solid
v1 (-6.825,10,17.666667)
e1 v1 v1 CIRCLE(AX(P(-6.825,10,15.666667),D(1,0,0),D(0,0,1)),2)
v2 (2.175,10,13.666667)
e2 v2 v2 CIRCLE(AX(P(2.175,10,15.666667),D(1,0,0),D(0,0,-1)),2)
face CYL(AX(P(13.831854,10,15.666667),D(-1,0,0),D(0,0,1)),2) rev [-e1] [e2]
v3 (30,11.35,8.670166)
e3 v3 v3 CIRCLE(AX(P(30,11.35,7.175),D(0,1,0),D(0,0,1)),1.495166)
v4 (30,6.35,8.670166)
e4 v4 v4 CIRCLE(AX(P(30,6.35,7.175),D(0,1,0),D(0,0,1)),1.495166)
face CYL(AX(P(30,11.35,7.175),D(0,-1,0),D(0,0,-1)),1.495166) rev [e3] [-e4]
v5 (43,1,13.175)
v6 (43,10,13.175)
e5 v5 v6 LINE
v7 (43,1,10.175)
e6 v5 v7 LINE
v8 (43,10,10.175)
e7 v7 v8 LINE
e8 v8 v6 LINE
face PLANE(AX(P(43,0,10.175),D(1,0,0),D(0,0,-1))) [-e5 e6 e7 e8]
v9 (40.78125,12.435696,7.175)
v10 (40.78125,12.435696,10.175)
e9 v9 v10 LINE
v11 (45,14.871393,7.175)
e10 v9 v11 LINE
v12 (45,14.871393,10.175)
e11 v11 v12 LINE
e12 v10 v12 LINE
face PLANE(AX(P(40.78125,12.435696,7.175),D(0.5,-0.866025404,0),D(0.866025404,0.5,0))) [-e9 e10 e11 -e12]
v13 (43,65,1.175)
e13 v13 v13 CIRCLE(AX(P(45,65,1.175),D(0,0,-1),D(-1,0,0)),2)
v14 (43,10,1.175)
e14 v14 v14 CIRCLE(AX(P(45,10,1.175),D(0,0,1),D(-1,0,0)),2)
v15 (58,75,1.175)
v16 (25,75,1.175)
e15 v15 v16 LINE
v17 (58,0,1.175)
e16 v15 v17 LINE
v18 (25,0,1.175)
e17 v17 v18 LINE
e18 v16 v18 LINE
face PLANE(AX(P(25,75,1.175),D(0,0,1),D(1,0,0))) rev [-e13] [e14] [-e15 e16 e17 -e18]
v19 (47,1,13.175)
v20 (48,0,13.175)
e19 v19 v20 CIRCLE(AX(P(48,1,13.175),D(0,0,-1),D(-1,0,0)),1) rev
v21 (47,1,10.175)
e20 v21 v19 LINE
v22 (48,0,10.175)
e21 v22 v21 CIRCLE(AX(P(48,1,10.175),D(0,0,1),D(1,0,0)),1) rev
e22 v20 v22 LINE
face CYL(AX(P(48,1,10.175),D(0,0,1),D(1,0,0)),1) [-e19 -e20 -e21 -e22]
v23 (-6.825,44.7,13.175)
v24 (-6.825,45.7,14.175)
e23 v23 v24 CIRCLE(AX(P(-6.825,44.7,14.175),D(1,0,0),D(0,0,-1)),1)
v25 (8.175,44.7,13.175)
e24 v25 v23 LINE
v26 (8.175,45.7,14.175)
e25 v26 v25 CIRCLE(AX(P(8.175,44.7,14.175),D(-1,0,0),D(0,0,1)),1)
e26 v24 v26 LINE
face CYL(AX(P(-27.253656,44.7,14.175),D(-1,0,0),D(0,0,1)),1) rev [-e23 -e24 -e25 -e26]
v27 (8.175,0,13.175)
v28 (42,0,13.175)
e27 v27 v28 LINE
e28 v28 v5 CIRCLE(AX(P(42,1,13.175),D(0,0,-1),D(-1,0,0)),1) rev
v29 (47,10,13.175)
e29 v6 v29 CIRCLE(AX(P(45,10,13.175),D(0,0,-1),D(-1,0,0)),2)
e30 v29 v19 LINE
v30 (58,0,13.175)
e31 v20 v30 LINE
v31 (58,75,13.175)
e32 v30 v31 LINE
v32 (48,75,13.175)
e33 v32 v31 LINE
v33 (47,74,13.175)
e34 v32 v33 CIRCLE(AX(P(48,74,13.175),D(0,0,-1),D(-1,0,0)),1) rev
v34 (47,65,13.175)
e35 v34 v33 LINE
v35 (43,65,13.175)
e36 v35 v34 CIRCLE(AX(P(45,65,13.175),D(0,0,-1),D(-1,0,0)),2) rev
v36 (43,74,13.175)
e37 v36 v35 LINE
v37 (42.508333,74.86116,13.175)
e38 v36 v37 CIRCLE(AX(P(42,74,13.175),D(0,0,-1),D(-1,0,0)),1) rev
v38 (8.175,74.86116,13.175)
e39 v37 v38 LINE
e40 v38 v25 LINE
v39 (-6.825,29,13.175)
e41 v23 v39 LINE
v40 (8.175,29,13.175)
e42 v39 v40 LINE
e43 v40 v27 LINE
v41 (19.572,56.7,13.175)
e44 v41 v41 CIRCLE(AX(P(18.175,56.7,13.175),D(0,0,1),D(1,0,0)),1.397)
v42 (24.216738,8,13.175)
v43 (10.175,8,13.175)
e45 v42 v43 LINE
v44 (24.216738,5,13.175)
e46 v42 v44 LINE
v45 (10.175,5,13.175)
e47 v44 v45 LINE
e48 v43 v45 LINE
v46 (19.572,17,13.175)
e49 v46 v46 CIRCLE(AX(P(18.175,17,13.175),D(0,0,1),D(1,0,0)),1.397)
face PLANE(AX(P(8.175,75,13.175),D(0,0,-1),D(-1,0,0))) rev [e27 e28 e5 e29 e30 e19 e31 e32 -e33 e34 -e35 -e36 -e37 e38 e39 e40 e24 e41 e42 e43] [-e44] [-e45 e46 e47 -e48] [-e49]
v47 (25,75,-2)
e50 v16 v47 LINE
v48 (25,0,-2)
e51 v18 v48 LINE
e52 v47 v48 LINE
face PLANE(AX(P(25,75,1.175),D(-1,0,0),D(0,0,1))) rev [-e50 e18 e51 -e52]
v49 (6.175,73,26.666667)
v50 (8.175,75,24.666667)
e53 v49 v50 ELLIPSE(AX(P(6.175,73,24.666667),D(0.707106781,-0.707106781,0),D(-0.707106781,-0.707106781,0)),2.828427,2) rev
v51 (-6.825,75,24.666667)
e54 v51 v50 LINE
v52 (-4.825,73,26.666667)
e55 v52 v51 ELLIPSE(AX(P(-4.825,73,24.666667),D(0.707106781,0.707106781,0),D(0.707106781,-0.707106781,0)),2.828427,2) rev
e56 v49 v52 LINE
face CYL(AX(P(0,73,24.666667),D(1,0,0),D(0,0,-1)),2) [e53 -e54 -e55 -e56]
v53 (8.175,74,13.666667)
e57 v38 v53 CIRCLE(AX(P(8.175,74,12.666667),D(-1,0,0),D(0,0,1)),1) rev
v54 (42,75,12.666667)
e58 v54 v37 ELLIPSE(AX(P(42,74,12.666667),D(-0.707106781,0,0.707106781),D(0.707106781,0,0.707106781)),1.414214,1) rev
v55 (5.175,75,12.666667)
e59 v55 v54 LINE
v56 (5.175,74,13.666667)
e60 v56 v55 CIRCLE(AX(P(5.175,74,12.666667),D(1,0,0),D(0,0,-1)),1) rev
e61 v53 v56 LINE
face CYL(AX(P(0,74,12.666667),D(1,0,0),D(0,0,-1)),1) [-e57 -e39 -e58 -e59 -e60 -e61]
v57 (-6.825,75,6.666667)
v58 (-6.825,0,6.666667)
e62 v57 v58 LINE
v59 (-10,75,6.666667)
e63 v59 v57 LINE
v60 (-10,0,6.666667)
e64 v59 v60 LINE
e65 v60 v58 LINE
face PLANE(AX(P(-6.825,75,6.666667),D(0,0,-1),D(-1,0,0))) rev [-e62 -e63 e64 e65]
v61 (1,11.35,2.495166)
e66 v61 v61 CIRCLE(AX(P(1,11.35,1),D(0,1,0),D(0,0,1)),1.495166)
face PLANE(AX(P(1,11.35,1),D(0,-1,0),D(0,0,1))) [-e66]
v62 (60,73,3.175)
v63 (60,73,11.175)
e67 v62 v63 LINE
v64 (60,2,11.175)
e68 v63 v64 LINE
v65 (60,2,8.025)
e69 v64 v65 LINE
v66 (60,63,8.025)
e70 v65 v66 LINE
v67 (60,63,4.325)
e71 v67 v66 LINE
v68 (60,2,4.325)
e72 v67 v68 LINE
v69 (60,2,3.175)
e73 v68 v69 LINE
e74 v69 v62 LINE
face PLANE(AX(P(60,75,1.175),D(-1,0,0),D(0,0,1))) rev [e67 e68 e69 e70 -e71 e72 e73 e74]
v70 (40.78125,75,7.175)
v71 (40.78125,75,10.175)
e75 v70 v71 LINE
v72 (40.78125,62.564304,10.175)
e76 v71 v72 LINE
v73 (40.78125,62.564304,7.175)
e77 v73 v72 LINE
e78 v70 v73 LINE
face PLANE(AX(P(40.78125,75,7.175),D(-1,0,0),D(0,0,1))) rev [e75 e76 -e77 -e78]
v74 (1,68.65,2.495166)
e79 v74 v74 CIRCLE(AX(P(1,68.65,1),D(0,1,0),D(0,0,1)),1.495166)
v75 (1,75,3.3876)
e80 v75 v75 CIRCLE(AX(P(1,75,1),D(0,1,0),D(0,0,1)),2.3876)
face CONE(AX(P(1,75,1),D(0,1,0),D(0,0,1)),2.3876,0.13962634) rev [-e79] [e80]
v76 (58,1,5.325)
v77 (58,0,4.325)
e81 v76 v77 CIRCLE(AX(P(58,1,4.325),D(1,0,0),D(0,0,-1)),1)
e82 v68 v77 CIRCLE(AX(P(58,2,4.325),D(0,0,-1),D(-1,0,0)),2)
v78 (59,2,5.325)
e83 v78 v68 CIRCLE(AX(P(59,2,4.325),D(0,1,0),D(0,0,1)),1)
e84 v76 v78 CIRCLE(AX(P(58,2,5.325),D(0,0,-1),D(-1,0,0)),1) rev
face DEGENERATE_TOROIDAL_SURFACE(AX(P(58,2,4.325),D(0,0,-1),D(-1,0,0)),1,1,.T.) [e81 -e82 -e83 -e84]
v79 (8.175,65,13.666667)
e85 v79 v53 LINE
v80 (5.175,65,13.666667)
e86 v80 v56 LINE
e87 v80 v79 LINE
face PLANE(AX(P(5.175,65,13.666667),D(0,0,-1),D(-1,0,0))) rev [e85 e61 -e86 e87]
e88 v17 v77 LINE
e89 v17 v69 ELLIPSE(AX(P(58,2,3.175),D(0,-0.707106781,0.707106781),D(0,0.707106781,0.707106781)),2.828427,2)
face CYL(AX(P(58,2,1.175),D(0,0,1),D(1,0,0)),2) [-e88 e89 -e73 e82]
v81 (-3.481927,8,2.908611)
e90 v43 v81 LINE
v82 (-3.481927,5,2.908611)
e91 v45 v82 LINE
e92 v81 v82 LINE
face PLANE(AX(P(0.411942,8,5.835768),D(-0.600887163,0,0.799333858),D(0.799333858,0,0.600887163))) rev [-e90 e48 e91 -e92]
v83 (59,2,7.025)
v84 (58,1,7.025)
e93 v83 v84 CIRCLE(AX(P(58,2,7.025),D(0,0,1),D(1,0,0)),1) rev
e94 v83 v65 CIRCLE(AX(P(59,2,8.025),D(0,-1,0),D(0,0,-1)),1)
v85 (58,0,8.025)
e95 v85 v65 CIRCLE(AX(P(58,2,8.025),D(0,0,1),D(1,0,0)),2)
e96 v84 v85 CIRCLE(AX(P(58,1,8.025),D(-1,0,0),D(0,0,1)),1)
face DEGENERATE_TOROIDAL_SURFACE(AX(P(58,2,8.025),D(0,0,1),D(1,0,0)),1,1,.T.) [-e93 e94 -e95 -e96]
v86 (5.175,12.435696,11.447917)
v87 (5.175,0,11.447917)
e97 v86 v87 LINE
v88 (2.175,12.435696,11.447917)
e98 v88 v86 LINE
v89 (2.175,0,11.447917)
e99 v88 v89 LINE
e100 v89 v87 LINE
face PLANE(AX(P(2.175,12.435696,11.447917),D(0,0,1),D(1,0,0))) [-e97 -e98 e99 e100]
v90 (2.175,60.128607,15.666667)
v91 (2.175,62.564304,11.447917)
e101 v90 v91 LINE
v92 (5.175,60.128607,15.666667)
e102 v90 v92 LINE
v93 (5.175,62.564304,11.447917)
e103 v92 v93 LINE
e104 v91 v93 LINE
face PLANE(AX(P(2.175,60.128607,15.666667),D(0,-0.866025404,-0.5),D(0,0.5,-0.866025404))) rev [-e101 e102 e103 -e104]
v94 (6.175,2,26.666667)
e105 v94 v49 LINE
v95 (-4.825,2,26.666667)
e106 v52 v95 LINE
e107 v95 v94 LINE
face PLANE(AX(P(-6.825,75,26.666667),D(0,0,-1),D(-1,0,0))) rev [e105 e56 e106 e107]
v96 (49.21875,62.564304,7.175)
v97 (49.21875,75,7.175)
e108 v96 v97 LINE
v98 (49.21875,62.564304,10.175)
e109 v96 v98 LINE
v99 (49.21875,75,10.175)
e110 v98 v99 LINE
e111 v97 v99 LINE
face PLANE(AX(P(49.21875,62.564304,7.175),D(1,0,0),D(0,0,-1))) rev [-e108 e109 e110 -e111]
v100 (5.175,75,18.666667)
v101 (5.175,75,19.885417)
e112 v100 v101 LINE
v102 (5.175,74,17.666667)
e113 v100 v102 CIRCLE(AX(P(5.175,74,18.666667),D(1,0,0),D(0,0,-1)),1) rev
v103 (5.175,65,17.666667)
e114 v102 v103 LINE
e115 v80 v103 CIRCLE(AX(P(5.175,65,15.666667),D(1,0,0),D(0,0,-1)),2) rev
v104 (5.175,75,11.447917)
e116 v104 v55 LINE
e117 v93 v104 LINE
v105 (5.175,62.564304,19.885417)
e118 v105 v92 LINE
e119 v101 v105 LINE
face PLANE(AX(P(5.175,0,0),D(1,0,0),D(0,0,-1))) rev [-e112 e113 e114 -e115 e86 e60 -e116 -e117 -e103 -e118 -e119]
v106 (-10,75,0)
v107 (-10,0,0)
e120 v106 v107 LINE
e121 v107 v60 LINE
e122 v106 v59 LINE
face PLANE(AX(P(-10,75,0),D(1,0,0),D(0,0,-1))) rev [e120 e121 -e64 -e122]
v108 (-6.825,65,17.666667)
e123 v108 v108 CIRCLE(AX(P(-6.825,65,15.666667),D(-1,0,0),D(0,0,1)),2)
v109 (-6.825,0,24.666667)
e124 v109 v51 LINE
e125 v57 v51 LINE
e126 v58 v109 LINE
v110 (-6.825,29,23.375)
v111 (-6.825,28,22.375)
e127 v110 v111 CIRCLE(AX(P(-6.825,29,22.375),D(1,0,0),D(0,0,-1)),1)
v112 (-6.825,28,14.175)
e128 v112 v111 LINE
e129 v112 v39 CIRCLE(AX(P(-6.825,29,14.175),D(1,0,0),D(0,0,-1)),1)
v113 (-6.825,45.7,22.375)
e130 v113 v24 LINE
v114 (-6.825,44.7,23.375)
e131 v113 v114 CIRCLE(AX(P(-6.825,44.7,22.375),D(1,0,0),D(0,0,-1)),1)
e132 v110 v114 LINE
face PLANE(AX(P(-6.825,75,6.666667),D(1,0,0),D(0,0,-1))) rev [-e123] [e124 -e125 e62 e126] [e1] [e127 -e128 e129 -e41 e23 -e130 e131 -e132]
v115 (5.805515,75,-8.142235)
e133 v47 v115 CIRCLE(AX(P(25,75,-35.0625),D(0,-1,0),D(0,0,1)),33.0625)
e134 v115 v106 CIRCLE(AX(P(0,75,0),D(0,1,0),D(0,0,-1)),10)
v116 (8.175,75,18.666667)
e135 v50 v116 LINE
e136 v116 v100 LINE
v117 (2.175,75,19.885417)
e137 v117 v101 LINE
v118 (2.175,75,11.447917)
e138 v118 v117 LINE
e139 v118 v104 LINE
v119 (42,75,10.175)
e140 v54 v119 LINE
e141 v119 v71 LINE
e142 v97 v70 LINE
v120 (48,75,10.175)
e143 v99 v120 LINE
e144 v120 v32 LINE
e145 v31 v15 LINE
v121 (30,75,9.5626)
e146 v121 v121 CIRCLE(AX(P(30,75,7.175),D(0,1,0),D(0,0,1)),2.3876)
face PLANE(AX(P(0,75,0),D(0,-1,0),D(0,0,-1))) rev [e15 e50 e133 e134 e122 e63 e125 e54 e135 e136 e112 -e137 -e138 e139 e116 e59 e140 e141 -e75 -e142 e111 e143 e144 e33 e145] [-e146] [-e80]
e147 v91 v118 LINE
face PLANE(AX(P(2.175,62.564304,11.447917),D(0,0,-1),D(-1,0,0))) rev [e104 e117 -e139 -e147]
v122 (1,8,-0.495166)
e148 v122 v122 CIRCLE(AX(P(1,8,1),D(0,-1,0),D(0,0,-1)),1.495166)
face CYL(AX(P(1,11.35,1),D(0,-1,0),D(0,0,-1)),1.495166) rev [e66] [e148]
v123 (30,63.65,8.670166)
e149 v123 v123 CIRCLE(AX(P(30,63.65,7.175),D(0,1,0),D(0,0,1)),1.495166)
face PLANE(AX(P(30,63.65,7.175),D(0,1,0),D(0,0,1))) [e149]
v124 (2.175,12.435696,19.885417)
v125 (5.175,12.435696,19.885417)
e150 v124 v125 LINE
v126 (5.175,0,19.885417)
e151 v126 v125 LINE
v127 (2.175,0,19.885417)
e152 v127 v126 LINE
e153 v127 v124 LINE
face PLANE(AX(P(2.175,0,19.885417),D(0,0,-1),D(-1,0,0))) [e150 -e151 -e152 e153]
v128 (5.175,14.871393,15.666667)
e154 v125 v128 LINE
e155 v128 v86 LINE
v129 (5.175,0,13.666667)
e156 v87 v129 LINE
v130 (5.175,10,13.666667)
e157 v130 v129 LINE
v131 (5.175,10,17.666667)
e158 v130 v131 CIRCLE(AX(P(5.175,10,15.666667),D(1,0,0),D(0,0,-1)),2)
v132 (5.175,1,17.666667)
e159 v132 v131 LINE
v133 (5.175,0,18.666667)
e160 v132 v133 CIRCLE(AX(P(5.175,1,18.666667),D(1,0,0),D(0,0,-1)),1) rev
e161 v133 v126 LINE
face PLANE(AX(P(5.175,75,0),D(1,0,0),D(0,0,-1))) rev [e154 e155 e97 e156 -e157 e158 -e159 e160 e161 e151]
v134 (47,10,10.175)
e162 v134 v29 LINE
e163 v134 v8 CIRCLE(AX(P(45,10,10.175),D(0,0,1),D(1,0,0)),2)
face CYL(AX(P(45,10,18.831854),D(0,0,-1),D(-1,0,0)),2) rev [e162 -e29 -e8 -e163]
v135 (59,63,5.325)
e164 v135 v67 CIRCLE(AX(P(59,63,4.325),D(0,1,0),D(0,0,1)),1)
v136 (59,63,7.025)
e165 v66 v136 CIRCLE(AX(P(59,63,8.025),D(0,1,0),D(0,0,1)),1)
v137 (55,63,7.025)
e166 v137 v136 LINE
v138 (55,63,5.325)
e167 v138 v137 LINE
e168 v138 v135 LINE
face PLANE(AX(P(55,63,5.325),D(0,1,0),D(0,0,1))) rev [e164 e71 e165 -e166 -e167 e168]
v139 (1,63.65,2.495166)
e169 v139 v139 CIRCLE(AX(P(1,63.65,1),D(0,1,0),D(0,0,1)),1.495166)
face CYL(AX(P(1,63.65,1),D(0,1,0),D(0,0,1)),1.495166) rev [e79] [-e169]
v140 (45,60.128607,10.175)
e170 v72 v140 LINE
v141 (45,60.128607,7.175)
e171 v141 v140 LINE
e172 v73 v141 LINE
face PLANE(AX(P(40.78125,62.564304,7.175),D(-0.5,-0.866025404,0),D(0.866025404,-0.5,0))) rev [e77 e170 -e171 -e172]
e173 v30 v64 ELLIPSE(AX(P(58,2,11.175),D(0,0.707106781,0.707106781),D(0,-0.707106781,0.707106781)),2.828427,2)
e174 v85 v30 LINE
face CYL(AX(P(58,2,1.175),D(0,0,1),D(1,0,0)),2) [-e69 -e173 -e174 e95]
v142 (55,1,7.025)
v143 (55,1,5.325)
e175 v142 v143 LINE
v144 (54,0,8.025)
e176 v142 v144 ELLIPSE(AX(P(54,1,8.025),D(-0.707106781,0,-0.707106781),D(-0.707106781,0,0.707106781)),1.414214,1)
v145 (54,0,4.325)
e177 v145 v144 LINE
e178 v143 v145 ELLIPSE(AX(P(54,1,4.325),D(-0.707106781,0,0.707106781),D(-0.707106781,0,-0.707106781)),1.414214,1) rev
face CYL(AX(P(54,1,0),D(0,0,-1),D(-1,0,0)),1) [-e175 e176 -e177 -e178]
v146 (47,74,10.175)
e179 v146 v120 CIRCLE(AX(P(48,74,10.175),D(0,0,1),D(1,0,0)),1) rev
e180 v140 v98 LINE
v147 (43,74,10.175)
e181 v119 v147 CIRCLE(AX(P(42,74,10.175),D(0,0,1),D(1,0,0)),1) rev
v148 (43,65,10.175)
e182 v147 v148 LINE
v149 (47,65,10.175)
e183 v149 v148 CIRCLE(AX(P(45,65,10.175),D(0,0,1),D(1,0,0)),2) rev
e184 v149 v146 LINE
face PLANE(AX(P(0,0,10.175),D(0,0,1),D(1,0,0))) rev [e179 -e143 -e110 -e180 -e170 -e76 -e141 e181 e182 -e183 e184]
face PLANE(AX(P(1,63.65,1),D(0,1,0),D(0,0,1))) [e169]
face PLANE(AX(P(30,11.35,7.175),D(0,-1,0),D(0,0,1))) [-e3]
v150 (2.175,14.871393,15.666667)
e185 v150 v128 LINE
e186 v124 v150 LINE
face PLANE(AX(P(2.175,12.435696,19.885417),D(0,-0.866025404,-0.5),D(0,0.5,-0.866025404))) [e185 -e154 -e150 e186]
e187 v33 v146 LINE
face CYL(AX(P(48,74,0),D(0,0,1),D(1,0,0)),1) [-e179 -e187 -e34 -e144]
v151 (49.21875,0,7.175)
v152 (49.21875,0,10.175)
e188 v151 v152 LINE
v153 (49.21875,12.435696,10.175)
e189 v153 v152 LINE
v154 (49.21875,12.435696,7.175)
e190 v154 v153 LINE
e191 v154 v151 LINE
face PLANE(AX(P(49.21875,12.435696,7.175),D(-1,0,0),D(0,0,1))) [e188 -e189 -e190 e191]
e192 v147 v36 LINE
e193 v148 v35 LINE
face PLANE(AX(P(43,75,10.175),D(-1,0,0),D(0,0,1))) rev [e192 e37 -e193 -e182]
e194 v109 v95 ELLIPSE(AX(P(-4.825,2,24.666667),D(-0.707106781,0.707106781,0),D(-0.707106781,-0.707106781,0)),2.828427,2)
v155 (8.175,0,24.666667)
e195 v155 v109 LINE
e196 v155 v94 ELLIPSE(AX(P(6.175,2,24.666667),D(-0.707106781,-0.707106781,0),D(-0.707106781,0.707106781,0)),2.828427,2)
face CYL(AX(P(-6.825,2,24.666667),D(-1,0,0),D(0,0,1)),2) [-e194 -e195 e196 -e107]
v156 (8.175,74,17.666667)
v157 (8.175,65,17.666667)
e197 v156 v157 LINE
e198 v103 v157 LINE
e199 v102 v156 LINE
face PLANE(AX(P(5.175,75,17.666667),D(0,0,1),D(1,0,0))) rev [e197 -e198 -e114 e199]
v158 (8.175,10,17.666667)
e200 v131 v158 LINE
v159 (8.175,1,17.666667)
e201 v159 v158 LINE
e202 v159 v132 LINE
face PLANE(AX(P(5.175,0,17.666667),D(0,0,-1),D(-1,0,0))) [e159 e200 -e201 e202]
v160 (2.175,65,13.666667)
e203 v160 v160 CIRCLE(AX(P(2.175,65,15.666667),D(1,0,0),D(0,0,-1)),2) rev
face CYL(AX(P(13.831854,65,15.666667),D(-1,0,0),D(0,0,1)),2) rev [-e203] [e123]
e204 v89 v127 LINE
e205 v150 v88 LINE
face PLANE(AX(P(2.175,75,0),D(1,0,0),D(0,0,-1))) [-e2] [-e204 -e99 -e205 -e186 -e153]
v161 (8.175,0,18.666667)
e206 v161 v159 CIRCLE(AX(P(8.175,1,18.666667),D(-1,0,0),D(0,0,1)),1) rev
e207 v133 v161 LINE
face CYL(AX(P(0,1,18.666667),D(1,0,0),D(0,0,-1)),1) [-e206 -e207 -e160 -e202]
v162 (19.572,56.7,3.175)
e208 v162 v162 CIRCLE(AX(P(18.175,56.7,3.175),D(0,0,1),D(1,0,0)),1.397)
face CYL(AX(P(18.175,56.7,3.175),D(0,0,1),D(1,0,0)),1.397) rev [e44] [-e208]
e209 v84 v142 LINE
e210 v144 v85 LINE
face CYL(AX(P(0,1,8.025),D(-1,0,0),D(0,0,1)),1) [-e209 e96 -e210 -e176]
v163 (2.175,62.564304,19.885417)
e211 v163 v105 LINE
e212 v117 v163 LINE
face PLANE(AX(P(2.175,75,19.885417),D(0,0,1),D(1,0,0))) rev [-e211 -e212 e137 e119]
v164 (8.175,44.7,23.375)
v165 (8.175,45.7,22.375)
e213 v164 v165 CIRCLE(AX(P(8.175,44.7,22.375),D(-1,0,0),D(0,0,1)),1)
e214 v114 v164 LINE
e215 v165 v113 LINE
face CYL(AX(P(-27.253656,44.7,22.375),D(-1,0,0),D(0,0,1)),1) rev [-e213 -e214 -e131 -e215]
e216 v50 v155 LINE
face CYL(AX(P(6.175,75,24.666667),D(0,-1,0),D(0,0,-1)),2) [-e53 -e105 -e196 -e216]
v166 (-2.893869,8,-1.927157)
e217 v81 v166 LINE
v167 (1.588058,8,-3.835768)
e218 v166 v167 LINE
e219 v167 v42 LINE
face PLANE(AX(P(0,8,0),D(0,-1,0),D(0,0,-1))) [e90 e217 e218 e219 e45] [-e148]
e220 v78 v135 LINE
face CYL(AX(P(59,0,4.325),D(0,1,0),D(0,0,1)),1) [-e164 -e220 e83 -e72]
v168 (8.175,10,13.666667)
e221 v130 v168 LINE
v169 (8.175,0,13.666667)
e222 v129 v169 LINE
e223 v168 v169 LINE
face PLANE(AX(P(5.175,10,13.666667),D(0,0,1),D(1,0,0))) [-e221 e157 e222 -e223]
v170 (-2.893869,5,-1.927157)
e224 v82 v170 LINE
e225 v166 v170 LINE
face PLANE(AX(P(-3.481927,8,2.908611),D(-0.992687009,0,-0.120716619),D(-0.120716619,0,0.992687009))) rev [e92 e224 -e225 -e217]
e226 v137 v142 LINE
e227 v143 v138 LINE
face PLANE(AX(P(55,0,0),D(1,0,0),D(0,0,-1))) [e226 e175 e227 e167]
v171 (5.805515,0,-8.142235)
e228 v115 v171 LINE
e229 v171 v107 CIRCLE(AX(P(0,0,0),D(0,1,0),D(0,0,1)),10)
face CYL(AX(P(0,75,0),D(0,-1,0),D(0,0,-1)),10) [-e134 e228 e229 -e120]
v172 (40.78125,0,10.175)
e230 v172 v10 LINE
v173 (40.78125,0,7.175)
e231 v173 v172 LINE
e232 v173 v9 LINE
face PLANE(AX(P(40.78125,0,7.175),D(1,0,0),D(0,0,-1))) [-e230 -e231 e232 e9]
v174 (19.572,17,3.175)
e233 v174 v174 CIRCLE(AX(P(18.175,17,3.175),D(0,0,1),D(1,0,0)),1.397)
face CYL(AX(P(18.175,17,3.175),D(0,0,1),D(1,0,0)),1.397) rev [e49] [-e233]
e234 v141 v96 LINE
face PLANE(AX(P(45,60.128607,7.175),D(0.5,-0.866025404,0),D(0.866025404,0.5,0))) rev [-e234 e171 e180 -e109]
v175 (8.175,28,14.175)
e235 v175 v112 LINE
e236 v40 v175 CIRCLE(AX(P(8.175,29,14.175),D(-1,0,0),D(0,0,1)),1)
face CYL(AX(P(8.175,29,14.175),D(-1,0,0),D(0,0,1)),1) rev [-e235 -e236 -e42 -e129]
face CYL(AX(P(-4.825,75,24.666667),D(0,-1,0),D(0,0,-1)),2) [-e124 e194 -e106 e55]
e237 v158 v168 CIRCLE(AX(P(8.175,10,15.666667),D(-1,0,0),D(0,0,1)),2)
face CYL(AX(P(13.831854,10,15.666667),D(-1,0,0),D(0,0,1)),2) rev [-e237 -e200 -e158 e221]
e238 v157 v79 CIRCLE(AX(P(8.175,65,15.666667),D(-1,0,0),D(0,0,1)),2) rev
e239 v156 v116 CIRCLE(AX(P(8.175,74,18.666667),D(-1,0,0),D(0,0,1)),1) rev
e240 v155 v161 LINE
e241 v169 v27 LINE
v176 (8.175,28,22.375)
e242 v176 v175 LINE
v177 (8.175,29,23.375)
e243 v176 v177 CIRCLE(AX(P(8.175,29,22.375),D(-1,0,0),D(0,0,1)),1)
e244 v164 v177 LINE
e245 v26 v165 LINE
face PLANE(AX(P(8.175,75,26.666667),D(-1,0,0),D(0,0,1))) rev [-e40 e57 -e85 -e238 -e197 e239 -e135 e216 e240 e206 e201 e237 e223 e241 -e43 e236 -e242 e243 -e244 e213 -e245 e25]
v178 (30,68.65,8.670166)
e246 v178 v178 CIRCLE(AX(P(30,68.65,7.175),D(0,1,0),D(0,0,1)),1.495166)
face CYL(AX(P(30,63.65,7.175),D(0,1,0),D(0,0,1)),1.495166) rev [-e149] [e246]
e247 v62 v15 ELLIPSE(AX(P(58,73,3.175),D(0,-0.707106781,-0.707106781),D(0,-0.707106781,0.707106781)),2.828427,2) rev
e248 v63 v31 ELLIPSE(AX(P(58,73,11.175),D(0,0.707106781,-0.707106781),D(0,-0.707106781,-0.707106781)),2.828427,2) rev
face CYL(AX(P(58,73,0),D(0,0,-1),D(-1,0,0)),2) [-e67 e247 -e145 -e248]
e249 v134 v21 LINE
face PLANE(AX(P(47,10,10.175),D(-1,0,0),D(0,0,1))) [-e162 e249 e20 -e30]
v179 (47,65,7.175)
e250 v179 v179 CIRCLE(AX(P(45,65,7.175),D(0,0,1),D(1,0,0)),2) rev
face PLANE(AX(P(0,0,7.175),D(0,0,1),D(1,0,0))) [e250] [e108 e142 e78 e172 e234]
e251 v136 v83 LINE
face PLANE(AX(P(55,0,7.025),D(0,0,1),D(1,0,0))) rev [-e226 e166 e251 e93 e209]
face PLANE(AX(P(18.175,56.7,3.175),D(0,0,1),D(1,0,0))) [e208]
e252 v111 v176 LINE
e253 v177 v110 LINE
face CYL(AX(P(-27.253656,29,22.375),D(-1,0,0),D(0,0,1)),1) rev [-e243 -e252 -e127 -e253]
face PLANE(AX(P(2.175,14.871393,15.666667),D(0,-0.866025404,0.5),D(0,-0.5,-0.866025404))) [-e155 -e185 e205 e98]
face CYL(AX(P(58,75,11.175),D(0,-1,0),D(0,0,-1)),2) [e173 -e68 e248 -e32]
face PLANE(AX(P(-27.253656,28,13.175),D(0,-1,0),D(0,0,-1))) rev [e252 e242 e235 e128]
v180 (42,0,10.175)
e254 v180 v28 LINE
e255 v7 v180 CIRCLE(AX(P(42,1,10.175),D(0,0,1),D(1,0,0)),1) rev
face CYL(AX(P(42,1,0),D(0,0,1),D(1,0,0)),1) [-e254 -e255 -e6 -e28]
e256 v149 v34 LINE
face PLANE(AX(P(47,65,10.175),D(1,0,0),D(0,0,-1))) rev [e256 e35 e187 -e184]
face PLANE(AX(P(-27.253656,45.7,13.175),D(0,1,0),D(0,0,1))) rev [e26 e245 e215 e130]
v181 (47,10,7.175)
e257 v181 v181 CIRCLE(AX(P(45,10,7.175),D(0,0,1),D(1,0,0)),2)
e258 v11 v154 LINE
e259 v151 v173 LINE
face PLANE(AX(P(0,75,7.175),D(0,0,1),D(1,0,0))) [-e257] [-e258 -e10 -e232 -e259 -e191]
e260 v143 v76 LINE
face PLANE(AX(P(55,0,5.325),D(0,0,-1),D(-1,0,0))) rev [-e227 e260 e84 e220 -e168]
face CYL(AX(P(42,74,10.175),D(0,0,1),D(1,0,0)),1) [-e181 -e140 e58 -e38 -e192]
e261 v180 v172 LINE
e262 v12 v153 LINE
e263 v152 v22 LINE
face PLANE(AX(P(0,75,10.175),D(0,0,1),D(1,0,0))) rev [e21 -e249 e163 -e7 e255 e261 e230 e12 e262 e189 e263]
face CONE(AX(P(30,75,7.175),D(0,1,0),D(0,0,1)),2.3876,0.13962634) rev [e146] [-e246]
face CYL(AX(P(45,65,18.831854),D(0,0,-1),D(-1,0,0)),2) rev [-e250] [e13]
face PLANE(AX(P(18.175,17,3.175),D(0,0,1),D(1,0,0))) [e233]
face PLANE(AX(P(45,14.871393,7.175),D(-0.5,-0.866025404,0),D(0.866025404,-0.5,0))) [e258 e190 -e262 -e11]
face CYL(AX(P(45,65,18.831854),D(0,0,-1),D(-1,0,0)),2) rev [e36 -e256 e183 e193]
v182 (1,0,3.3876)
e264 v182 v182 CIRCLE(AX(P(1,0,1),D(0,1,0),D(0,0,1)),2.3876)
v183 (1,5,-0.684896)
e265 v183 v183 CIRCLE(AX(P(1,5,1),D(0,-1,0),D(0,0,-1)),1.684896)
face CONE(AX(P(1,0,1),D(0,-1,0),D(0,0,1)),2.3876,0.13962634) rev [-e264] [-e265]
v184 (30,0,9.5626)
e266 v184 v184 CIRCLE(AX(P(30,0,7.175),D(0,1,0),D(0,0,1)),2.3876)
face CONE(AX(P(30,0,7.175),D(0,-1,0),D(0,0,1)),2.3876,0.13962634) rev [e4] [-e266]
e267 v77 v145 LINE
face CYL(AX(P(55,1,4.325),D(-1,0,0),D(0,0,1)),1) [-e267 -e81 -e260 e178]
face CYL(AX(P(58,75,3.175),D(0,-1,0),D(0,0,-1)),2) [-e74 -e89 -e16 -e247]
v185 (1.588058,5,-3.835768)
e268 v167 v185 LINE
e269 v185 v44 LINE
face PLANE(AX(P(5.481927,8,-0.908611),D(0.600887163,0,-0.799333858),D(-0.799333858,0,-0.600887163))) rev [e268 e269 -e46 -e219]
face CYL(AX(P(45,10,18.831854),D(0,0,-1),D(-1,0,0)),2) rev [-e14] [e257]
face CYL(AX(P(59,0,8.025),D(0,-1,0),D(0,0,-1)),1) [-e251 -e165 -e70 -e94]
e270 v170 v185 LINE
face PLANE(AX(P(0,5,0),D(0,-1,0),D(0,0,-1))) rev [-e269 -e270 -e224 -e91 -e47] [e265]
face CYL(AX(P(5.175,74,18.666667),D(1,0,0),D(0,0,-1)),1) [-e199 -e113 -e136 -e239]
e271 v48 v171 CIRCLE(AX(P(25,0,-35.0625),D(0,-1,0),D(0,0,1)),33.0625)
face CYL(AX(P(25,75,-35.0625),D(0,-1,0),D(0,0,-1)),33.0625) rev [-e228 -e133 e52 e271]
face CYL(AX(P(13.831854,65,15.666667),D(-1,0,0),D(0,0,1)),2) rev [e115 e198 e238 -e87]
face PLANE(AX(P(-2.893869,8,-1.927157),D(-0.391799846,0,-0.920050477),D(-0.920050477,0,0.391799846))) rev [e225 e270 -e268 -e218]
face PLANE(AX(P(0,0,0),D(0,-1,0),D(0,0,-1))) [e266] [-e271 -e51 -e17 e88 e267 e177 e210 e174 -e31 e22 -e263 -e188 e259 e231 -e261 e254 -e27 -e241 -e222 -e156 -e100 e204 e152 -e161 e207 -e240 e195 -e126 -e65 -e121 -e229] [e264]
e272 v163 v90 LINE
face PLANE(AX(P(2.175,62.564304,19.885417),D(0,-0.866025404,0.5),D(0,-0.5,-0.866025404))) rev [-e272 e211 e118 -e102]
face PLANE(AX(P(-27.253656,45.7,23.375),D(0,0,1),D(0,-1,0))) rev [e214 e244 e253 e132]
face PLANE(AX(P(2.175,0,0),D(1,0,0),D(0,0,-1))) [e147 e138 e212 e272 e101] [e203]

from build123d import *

# Parameters (mm, degrees)
BOSS_EXTRUDE1_DEPTH          = 75
SKETCH2_R                    = 2
CUT_EXTRUDE1_DEPTH           = 15
SKETCH4_R                    = 2
CUT_EXTRUDE2_DEPTH           = 12
SKETCH3_R                    = 2.3876
CUT_EXTRUDE3_DEPTH           = 6.35
CUT_EXTRUDE3_DRAFT           = -8
CUT_EXTRUDE3_PROFILE_2_DEPTH = 6.35
CUT_EXTRUDE3_PROFILE_2_DRAFT = -8
CUT_EXTRUDE4_START           = -3
CUT_EXTRUDE4_DEPTH           = 3
CUT_EXTRUDE5_START           = -3
CUT_EXTRUDE5_DEPTH           = 3
CUT_EXTRUDE6_START           = -3
CUT_EXTRUDE6_DEPTH           = 3
CUT_EXTRUDE7_START           = -3
CUT_EXTRUDE7_DEPTH           = 3
SKETCH9_R                    = 1.4951657
CUT_EXTRUDE8_DEPTH           = 5
MIRROR2_COPY_1_SKETCH_R      = 2.3876
MIRROR2_COPY_1_DEPTH         = 6.35
MIRROR2_COPY_1_DRAFT         = -8
MIRROR2_COPY_2_SKETCH_R      = 2.3876
MIRROR2_COPY_2_DEPTH         = 6.35
MIRROR2_COPY_2_DRAFT         = -8
MIRROR2_COPY_3_SKETCH_R      = 2.3876
MIRROR2_COPY_3_DEPTH         = 6.35
MIRROR2_COPY_3_DRAFT         = -8
FILLET2_START                = 9
FILLET2_DEPTH                = 4.666666667
FILLET2_START_2              = 4
FILLET2_2_DEPTH              = 39
FILLET3_R                    = 2
SKETCH10_W                   = 1.7
SKETCH10_H                   = 63
CUT_EXTRUDE9_DEPTH           = 5
FILLET4_R                    = 1
SKETCH11_W                   = 10.2
SKETCH11_H                   = 17.7
CUT_EXTRUDE10_DEPTH          = 15
SKETCH12_R                   = 1.397
CUT_EXTRUDE11_DEPTH          = 10
FILLET5_R                    = 1
CUT_EXTRUDE12_START          = -5
CUT_EXTRUDE12_DEPTH          = 3


with BuildPart() as part:
    # Sketch1 → Boss-Extrude1 (new body)
    with BuildSketch(Plane(origin=(0, 0, 0), x_dir=(1, 0, 0), z_dir=(0, 1, 0))):
        with BuildLine():
            Line((-6.825, -6.666666667), (-6.825, -26.666666667))
            Line((-6.825, -26.666666667), (8.175, -26.666666667))
            Line((8.175, -26.666666667), (8.175, -13.175))
            Line((8.175, -13.175), (60, -13.175))
            Line((60, -13.175), (60, -1.175))
            Line((60, -1.175), (25, -1.175))
            Line((25, -1.175), (25, 2))
            ThreePointArc((25, 2), (14.923352523, 3.572976633), (5.805515239, 8.142235123))
            ThreePointArc((5.805515239, 8.142235123), (3.047757271, 9.524241472), (0, 10))
            ThreePointArc((0, 10), (-7.071067812, 7.071067812), (-10, 0))
            Line((-10, 0), (-10, -6.666666667))
            Line((-10, -6.666666667), (-6.825, -6.666666667))
        make_face()
    extrude(amount=BOSS_EXTRUDE1_DEPTH)

    # Sketch2 → Cut-Extrude1 (cut)
    with BuildSketch(Plane.ZY.offset(6.825)):
        with Locations((15.666666667, 65)):
            Circle(SKETCH2_R)
    cut_extrude1 = extrude(amount=-CUT_EXTRUDE1_DEPTH, mode=Mode.SUBTRACT)

    # Sketch4 → Cut-Extrude2 (cut)
    with BuildSketch(Plane(origin=(0, 0, 1.175), x_dir=(-1, 0, 0), z_dir=(0, 0, -1))):
        with Locations((-45, 65)):
            Circle(SKETCH4_R)
    cut_extrude2 = extrude(amount=-CUT_EXTRUDE2_DEPTH, mode=Mode.SUBTRACT)


with BuildPart() as cut_extrude3_tool:
    # Sketch3 → Cut-Extrude3 (with draft: the straight prism first)
    with BuildSketch(Plane(origin=(0, 75, 0), x_dir=(1, 0, 0), z_dir=(0, 1, 0))):
        with Locations((1, -1)):
            Circle(SKETCH3_R)
    extrude(amount=-CUT_EXTRUDE3_DEPTH)
    # Cut-Extrude3: the draft: its side faces are tilted about the plane it starts from
    cut_extrude3_sides = [cut_extrude3_tool.faces().sort_by_distance(p)[0] for p in [
        (-1.3876, 71.825, 1),
    ]]
    draft(cut_extrude3_sides, Plane(origin=(0, 75, 0), x_dir=(1, 0, 0), z_dir=(0, 1, 0)), CUT_EXTRUDE3_DRAFT)


with BuildPart() as part_1:
    add(part.part)

    # Cut-Extrude3: cut by cut_extrude3_tool
    add(cut_extrude3_tool.part, mode=Mode.SUBTRACT)


with BuildPart() as cut_extrude3_profile_2_tool:
    # Sketch3 → Cut-Extrude3 profile 2 (with draft: the straight prism first)
    with BuildSketch(Plane(origin=(0, 75, 0), x_dir=(1, 0, 0), z_dir=(0, 1, 0))):
        with Locations((30, -7.175)):
            Circle(SKETCH3_R)
    extrude(amount=-CUT_EXTRUDE3_PROFILE_2_DEPTH)
    # Cut-Extrude3 profile 2: the draft: its side faces are tilted about the plane it starts from
    cut_extrude3_profile_2_sides = [cut_extrude3_profile_2_tool.faces().sort_by_distance(p)[0] for p in [
        (27.6124, 71.825, 7.175),
    ]]
    draft(cut_extrude3_profile_2_sides, Plane(origin=(0, 75, 0), x_dir=(1, 0, 0), z_dir=(0, 1, 0)), CUT_EXTRUDE3_PROFILE_2_DRAFT)


with BuildPart() as part_2:
    add(part_1.part)

    # Cut-Extrude3 profile 2: cut by cut_extrude3_profile_2_tool
    add(cut_extrude3_profile_2_tool.part, mode=Mode.SUBTRACT)

    # Sketch5 → Cut-Extrude4 (cut)
    with BuildSketch(Plane(origin=(8.175, 0, 0), x_dir=(0, 0, -1), z_dir=(1, 0, 0)).offset(CUT_EXTRUDE4_START)):
        Polygon((-19.885416667, 62.564303552), (-15.666666667, 60.128607104), (-11.447916667, 62.564303552), (-11.447916667, 75), (-19.885416667, 75), align=None)
    cut_extrude4 = extrude(amount=-CUT_EXTRUDE4_DEPTH, mode=Mode.SUBTRACT)

    # Sketch6 → Cut-Extrude5 (cut)
    with BuildSketch(Plane(origin=(8.175, 0, 0), x_dir=(0, 0, -1), z_dir=(1, 0, 0)).offset(CUT_EXTRUDE5_START)):
        with BuildLine():
            Line((-13.666666667, 65), (-13.666666667, 75))
            Line((-13.666666667, 75), (-17.666666667, 75))
            Line((-17.666666667, 75), (-17.666666667, 65))
            ThreePointArc((-17.666666667, 65), (-15.666666667, 67), (-13.666666667, 65))
        make_face()
    cut_extrude5 = extrude(amount=CUT_EXTRUDE5_DEPTH, mode=Mode.SUBTRACT)

    # Sketch7 → Cut-Extrude6 (cut)
    with BuildSketch(Plane.XY.offset(13.175).offset(CUT_EXTRUDE6_START)):
        Polygon((40.78125, 62.564303552), (45, 60.128607104), (49.21875, 62.564303552), (49.21875, 75), (40.78125, 75), align=None)
    cut_extrude6 = extrude(amount=-CUT_EXTRUDE6_DEPTH, mode=Mode.SUBTRACT)

    # Sketch8 → Cut-Extrude7 (cut)
    with BuildSketch(Plane.XY.offset(13.175).offset(CUT_EXTRUDE7_START)):
        with BuildLine():
            Line((47, 65), (47, 75))
            Line((47, 75), (43, 75))
            Line((43, 75), (43, 65))
            ThreePointArc((43, 65), (45, 67), (47, 65))
        make_face()
    cut_extrude7 = extrude(amount=CUT_EXTRUDE7_DEPTH, mode=Mode.SUBTRACT)

    # Sketch9 → Cut-Extrude8 (cut)
    with BuildSketch(Plane(origin=(0, 68.65, 0), x_dir=(1, 0, 0), z_dir=(0, 1, 0))):
        with Locations(Location((1, -1, 0), (0, 0, 270))):
            Circle(SKETCH9_R)
        with Locations(Location((30, -7.175, 0), (0, 0, 270))):
            Circle(SKETCH9_R)
    cut_extrude8 = extrude(amount=-CUT_EXTRUDE8_DEPTH, mode=Mode.SUBTRACT)

    # Mirror2: Cut-Extrude1, Cut-Extrude2, Cut-Extrude4, Cut-Extrude5, Cut-Extrude6, Cut-Extrude7, Cut-Extrude8 across plane
    add(cut_extrude1.mirror(Plane.ZX.offset(37.5)), mode=Mode.SUBTRACT)
    add(cut_extrude2.mirror(Plane.ZX.offset(37.5)), mode=Mode.SUBTRACT)
    add(cut_extrude4.mirror(Plane.ZX.offset(37.5)), mode=Mode.SUBTRACT)
    add(cut_extrude5.mirror(Plane.ZX.offset(37.5)), mode=Mode.SUBTRACT)
    add(cut_extrude6.mirror(Plane.ZX.offset(37.5)), mode=Mode.SUBTRACT)
    add(cut_extrude7.mirror(Plane.ZX.offset(37.5)), mode=Mode.SUBTRACT)
    add(cut_extrude8.mirror(Plane.ZX.offset(37.5)), mode=Mode.SUBTRACT)


with BuildPart() as mirror2_copy_1_tool:
    # Mirror2 copy 1 sketch → Mirror2 copy 1 (with draft: the straight prism first)
    with BuildSketch(Plane.XZ):
        with Locations((1, 1)):
            Circle(MIRROR2_COPY_1_SKETCH_R)
    extrude(amount=-MIRROR2_COPY_1_DEPTH)
    # Mirror2 copy 1: the draft: its side faces are tilted about the plane it starts from
    mirror2_copy_1_sides = [mirror2_copy_1_tool.faces().sort_by_distance(p)[0] for p in [
        (-1.3876, 3.175, 1),
    ]]
    draft(mirror2_copy_1_sides, Plane.XZ, MIRROR2_COPY_1_DRAFT)


with BuildPart() as part_3:
    add(part_2.part)

    # Mirror2 copy 1: cut by mirror2_copy_1_tool
    add(mirror2_copy_1_tool.part, mode=Mode.SUBTRACT)


with BuildPart() as mirror2_copy_2_tool:
    # Mirror2 copy 2 sketch → Mirror2 copy 2 (with draft: the straight prism first)
    with BuildSketch(Plane.XZ):
        with Locations((30, 7.175)):
            Circle(MIRROR2_COPY_2_SKETCH_R)
    extrude(amount=-MIRROR2_COPY_2_DEPTH)
    # Mirror2 copy 2: the draft: its side faces are tilted about the plane it starts from
    mirror2_copy_2_sides = [mirror2_copy_2_tool.faces().sort_by_distance(p)[0] for p in [
        (27.6124, 3.175, 7.175),
    ]]
    draft(mirror2_copy_2_sides, Plane.XZ, MIRROR2_COPY_2_DRAFT)


with BuildPart() as part_4:
    add(part_3.part)

    # Mirror2 copy 2: cut by mirror2_copy_2_tool
    add(mirror2_copy_2_tool.part, mode=Mode.SUBTRACT)


with BuildPart() as mirror2_copy_3_tool:
    # Mirror2 copy 3 sketch → Mirror2 copy 3 (with draft: the straight prism first)
    with BuildSketch(Plane.XZ):
        with Locations((30, 7.175)):
            Circle(MIRROR2_COPY_3_SKETCH_R)
    extrude(amount=-MIRROR2_COPY_3_DEPTH)
    # Mirror2 copy 3: the draft: its side faces are tilted about the plane it starts from
    mirror2_copy_3_sides = [mirror2_copy_3_tool.faces().sort_by_distance(p)[0] for p in [
        (27.6124, 3.175, 7.175),
    ]]
    draft(mirror2_copy_3_sides, Plane.XZ, MIRROR2_COPY_3_DRAFT)


with BuildPart() as part_5:
    add(part_4.part)

    # Mirror2 copy 3: cut by mirror2_copy_3_tool
    add(mirror2_copy_3_tool.part, mode=Mode.SUBTRACT)

    # Fillet2: read off the stored shape, not the designer's step
    # Fillet2 outline → Fillet2 (cut)
    with BuildSketch(Plane.XY.offset(FILLET2_START)):
        with BuildLine():
            Line((47, 1), (47, 0))
            Line((47, 0), (48, 0))
            ThreePointArc((48, 0), (47.292893219, 0.292893219), (47, 1))
        make_face()
        with BuildLine():
            Line((48, 75), (47, 75))
            Line((47, 75), (47, 74))
            ThreePointArc((47, 74), (47.292893219, 74.707106781), (48, 75))
        make_face()
        with BuildLine():
            Line((43, 75), (42, 75))
            ThreePointArc((42, 75), (42.707106781, 74.707106781), (43, 74))
            Line((43, 74), (43, 75))
        make_face()
        with BuildLine():
            ThreePointArc((43, 1), (42.707106781, 0.292893219), (42, 0))
            Line((42, 0), (43, 0))
            Line((43, 0), (43, 1))
        make_face()
    extrude(amount=FILLET2_DEPTH, mode=Mode.SUBTRACT)

    # Fillet2 2 outline → Fillet2 2 (cut)
    with BuildSketch(Plane.YZ.offset(FILLET2_START_2)):
        with BuildLine():
            Line((74, 17.666666667), (75, 17.666666667))
            Line((75, 17.666666667), (75, 18.666666667))
            ThreePointArc((75, 18.666666667), (74.707106782, 17.959559886), (74, 17.666666667))
        make_face()
        with BuildLine():
            ThreePointArc((74, 13.666666667), (74.707106781, 13.373773448), (75, 12.666666667))
            Line((75, 12.666666667), (75, 13.666666667))
            Line((75, 13.666666667), (74, 13.666666667))
        make_face()
        with BuildLine():
            ThreePointArc((1, 17.666666667), (0.292893218, 17.959559886), (0, 18.666666667))
            Line((0, 18.666666667), (0, 17.666666667))
            Line((0, 17.666666667), (1, 17.666666667))
        make_face()
    extrude(amount=FILLET2_2_DEPTH, mode=Mode.SUBTRACT)

    # Fillet3
    fillet3_edges = [part_5.edges().sort_by_distance(p)[0] for p in [
        (60, 0, 7.175),
        (0.675, 0, 26.666666667),
        (60, 37.5, 1.175),
        (60, 37.5, 13.175),
        (8.175, 37.5, 26.666666667),
        (-6.825, 37.5, 26.666666667),
        (0.675, 75, 26.666666667),
        (60, 75, 7.175),
    ]]
    fillet(fillet3_edges, radius=FILLET3_R)

    # Sketch10 → Cut-Extrude9 (cut)
    with BuildSketch(Plane(origin=(60, 0, 0), x_dir=(0, 0, -1), z_dir=(1, 0, 0))):
        with Locations((-6.175, 31.5)):
            Rectangle(SKETCH10_W, SKETCH10_H)
    extrude(amount=-CUT_EXTRUDE9_DEPTH, mode=Mode.SUBTRACT)

    # Fillet4
    fillet4_edges = [part_5.edges().sort_by_distance(p)[0] for p in [
        (59.414213562, 0.585786438, 7.025),
        (59.414213562, 0.585786438, 5.325),
        (60, 32.5, 7.025),
        (60, 32.5, 5.325),
        (55, 0, 6.175),
        (56.5, 0, 5.325),
        (56.5, 0, 7.025),
    ]]
    fillet(fillet4_edges, radius=FILLET4_R)

    # Sketch11 → Cut-Extrude10 (cut)
    with BuildSketch(Plane(origin=(8.175, 0, 0), x_dir=(0, 0, -1), z_dir=(1, 0, 0))):
        with Locations((-18.275, 36.85)):
            Rectangle(SKETCH11_W, SKETCH11_H)
    extrude(amount=-CUT_EXTRUDE10_DEPTH, mode=Mode.SUBTRACT)

    # Sketch12 → Cut-Extrude11 (cut)
    with BuildSketch(Plane.XY.offset(13.175)):
        with Locations((18.175, 17)):
            Circle(SKETCH12_R)
        with Locations((18.175, 56.7)):
            Circle(SKETCH12_R)
    extrude(amount=-CUT_EXTRUDE11_DEPTH, mode=Mode.SUBTRACT)

    # Fillet5
    fillet5_edges = [part_5.edges().sort_by_distance(p)[0] for p in [
        (0.675, 45.7, 13.175),
        (0.675, 28, 13.175),
        (0.675, 28, 23.375),
        (0.675, 45.7, 23.375),
    ]]
    fillet(fillet5_edges, radius=FILLET5_R)

    # Sketch13 → Cut-Extrude12 (cut)
    with BuildSketch(Plane.XZ.offset(CUT_EXTRUDE12_START)):
        Polygon((-2.893869279, -1.927157459), (1.588058081, -3.835768444), (5.48192736, -0.908610985), (24.216737808, 13.175), (10.175, 13.175), (0.411941919, 5.835768444), (-3.48192736, 2.908610985), align=None)
    extrude(amount=-CUT_EXTRUDE12_DEPTH, mode=Mode.SUBTRACT)


solid = part_5.part
